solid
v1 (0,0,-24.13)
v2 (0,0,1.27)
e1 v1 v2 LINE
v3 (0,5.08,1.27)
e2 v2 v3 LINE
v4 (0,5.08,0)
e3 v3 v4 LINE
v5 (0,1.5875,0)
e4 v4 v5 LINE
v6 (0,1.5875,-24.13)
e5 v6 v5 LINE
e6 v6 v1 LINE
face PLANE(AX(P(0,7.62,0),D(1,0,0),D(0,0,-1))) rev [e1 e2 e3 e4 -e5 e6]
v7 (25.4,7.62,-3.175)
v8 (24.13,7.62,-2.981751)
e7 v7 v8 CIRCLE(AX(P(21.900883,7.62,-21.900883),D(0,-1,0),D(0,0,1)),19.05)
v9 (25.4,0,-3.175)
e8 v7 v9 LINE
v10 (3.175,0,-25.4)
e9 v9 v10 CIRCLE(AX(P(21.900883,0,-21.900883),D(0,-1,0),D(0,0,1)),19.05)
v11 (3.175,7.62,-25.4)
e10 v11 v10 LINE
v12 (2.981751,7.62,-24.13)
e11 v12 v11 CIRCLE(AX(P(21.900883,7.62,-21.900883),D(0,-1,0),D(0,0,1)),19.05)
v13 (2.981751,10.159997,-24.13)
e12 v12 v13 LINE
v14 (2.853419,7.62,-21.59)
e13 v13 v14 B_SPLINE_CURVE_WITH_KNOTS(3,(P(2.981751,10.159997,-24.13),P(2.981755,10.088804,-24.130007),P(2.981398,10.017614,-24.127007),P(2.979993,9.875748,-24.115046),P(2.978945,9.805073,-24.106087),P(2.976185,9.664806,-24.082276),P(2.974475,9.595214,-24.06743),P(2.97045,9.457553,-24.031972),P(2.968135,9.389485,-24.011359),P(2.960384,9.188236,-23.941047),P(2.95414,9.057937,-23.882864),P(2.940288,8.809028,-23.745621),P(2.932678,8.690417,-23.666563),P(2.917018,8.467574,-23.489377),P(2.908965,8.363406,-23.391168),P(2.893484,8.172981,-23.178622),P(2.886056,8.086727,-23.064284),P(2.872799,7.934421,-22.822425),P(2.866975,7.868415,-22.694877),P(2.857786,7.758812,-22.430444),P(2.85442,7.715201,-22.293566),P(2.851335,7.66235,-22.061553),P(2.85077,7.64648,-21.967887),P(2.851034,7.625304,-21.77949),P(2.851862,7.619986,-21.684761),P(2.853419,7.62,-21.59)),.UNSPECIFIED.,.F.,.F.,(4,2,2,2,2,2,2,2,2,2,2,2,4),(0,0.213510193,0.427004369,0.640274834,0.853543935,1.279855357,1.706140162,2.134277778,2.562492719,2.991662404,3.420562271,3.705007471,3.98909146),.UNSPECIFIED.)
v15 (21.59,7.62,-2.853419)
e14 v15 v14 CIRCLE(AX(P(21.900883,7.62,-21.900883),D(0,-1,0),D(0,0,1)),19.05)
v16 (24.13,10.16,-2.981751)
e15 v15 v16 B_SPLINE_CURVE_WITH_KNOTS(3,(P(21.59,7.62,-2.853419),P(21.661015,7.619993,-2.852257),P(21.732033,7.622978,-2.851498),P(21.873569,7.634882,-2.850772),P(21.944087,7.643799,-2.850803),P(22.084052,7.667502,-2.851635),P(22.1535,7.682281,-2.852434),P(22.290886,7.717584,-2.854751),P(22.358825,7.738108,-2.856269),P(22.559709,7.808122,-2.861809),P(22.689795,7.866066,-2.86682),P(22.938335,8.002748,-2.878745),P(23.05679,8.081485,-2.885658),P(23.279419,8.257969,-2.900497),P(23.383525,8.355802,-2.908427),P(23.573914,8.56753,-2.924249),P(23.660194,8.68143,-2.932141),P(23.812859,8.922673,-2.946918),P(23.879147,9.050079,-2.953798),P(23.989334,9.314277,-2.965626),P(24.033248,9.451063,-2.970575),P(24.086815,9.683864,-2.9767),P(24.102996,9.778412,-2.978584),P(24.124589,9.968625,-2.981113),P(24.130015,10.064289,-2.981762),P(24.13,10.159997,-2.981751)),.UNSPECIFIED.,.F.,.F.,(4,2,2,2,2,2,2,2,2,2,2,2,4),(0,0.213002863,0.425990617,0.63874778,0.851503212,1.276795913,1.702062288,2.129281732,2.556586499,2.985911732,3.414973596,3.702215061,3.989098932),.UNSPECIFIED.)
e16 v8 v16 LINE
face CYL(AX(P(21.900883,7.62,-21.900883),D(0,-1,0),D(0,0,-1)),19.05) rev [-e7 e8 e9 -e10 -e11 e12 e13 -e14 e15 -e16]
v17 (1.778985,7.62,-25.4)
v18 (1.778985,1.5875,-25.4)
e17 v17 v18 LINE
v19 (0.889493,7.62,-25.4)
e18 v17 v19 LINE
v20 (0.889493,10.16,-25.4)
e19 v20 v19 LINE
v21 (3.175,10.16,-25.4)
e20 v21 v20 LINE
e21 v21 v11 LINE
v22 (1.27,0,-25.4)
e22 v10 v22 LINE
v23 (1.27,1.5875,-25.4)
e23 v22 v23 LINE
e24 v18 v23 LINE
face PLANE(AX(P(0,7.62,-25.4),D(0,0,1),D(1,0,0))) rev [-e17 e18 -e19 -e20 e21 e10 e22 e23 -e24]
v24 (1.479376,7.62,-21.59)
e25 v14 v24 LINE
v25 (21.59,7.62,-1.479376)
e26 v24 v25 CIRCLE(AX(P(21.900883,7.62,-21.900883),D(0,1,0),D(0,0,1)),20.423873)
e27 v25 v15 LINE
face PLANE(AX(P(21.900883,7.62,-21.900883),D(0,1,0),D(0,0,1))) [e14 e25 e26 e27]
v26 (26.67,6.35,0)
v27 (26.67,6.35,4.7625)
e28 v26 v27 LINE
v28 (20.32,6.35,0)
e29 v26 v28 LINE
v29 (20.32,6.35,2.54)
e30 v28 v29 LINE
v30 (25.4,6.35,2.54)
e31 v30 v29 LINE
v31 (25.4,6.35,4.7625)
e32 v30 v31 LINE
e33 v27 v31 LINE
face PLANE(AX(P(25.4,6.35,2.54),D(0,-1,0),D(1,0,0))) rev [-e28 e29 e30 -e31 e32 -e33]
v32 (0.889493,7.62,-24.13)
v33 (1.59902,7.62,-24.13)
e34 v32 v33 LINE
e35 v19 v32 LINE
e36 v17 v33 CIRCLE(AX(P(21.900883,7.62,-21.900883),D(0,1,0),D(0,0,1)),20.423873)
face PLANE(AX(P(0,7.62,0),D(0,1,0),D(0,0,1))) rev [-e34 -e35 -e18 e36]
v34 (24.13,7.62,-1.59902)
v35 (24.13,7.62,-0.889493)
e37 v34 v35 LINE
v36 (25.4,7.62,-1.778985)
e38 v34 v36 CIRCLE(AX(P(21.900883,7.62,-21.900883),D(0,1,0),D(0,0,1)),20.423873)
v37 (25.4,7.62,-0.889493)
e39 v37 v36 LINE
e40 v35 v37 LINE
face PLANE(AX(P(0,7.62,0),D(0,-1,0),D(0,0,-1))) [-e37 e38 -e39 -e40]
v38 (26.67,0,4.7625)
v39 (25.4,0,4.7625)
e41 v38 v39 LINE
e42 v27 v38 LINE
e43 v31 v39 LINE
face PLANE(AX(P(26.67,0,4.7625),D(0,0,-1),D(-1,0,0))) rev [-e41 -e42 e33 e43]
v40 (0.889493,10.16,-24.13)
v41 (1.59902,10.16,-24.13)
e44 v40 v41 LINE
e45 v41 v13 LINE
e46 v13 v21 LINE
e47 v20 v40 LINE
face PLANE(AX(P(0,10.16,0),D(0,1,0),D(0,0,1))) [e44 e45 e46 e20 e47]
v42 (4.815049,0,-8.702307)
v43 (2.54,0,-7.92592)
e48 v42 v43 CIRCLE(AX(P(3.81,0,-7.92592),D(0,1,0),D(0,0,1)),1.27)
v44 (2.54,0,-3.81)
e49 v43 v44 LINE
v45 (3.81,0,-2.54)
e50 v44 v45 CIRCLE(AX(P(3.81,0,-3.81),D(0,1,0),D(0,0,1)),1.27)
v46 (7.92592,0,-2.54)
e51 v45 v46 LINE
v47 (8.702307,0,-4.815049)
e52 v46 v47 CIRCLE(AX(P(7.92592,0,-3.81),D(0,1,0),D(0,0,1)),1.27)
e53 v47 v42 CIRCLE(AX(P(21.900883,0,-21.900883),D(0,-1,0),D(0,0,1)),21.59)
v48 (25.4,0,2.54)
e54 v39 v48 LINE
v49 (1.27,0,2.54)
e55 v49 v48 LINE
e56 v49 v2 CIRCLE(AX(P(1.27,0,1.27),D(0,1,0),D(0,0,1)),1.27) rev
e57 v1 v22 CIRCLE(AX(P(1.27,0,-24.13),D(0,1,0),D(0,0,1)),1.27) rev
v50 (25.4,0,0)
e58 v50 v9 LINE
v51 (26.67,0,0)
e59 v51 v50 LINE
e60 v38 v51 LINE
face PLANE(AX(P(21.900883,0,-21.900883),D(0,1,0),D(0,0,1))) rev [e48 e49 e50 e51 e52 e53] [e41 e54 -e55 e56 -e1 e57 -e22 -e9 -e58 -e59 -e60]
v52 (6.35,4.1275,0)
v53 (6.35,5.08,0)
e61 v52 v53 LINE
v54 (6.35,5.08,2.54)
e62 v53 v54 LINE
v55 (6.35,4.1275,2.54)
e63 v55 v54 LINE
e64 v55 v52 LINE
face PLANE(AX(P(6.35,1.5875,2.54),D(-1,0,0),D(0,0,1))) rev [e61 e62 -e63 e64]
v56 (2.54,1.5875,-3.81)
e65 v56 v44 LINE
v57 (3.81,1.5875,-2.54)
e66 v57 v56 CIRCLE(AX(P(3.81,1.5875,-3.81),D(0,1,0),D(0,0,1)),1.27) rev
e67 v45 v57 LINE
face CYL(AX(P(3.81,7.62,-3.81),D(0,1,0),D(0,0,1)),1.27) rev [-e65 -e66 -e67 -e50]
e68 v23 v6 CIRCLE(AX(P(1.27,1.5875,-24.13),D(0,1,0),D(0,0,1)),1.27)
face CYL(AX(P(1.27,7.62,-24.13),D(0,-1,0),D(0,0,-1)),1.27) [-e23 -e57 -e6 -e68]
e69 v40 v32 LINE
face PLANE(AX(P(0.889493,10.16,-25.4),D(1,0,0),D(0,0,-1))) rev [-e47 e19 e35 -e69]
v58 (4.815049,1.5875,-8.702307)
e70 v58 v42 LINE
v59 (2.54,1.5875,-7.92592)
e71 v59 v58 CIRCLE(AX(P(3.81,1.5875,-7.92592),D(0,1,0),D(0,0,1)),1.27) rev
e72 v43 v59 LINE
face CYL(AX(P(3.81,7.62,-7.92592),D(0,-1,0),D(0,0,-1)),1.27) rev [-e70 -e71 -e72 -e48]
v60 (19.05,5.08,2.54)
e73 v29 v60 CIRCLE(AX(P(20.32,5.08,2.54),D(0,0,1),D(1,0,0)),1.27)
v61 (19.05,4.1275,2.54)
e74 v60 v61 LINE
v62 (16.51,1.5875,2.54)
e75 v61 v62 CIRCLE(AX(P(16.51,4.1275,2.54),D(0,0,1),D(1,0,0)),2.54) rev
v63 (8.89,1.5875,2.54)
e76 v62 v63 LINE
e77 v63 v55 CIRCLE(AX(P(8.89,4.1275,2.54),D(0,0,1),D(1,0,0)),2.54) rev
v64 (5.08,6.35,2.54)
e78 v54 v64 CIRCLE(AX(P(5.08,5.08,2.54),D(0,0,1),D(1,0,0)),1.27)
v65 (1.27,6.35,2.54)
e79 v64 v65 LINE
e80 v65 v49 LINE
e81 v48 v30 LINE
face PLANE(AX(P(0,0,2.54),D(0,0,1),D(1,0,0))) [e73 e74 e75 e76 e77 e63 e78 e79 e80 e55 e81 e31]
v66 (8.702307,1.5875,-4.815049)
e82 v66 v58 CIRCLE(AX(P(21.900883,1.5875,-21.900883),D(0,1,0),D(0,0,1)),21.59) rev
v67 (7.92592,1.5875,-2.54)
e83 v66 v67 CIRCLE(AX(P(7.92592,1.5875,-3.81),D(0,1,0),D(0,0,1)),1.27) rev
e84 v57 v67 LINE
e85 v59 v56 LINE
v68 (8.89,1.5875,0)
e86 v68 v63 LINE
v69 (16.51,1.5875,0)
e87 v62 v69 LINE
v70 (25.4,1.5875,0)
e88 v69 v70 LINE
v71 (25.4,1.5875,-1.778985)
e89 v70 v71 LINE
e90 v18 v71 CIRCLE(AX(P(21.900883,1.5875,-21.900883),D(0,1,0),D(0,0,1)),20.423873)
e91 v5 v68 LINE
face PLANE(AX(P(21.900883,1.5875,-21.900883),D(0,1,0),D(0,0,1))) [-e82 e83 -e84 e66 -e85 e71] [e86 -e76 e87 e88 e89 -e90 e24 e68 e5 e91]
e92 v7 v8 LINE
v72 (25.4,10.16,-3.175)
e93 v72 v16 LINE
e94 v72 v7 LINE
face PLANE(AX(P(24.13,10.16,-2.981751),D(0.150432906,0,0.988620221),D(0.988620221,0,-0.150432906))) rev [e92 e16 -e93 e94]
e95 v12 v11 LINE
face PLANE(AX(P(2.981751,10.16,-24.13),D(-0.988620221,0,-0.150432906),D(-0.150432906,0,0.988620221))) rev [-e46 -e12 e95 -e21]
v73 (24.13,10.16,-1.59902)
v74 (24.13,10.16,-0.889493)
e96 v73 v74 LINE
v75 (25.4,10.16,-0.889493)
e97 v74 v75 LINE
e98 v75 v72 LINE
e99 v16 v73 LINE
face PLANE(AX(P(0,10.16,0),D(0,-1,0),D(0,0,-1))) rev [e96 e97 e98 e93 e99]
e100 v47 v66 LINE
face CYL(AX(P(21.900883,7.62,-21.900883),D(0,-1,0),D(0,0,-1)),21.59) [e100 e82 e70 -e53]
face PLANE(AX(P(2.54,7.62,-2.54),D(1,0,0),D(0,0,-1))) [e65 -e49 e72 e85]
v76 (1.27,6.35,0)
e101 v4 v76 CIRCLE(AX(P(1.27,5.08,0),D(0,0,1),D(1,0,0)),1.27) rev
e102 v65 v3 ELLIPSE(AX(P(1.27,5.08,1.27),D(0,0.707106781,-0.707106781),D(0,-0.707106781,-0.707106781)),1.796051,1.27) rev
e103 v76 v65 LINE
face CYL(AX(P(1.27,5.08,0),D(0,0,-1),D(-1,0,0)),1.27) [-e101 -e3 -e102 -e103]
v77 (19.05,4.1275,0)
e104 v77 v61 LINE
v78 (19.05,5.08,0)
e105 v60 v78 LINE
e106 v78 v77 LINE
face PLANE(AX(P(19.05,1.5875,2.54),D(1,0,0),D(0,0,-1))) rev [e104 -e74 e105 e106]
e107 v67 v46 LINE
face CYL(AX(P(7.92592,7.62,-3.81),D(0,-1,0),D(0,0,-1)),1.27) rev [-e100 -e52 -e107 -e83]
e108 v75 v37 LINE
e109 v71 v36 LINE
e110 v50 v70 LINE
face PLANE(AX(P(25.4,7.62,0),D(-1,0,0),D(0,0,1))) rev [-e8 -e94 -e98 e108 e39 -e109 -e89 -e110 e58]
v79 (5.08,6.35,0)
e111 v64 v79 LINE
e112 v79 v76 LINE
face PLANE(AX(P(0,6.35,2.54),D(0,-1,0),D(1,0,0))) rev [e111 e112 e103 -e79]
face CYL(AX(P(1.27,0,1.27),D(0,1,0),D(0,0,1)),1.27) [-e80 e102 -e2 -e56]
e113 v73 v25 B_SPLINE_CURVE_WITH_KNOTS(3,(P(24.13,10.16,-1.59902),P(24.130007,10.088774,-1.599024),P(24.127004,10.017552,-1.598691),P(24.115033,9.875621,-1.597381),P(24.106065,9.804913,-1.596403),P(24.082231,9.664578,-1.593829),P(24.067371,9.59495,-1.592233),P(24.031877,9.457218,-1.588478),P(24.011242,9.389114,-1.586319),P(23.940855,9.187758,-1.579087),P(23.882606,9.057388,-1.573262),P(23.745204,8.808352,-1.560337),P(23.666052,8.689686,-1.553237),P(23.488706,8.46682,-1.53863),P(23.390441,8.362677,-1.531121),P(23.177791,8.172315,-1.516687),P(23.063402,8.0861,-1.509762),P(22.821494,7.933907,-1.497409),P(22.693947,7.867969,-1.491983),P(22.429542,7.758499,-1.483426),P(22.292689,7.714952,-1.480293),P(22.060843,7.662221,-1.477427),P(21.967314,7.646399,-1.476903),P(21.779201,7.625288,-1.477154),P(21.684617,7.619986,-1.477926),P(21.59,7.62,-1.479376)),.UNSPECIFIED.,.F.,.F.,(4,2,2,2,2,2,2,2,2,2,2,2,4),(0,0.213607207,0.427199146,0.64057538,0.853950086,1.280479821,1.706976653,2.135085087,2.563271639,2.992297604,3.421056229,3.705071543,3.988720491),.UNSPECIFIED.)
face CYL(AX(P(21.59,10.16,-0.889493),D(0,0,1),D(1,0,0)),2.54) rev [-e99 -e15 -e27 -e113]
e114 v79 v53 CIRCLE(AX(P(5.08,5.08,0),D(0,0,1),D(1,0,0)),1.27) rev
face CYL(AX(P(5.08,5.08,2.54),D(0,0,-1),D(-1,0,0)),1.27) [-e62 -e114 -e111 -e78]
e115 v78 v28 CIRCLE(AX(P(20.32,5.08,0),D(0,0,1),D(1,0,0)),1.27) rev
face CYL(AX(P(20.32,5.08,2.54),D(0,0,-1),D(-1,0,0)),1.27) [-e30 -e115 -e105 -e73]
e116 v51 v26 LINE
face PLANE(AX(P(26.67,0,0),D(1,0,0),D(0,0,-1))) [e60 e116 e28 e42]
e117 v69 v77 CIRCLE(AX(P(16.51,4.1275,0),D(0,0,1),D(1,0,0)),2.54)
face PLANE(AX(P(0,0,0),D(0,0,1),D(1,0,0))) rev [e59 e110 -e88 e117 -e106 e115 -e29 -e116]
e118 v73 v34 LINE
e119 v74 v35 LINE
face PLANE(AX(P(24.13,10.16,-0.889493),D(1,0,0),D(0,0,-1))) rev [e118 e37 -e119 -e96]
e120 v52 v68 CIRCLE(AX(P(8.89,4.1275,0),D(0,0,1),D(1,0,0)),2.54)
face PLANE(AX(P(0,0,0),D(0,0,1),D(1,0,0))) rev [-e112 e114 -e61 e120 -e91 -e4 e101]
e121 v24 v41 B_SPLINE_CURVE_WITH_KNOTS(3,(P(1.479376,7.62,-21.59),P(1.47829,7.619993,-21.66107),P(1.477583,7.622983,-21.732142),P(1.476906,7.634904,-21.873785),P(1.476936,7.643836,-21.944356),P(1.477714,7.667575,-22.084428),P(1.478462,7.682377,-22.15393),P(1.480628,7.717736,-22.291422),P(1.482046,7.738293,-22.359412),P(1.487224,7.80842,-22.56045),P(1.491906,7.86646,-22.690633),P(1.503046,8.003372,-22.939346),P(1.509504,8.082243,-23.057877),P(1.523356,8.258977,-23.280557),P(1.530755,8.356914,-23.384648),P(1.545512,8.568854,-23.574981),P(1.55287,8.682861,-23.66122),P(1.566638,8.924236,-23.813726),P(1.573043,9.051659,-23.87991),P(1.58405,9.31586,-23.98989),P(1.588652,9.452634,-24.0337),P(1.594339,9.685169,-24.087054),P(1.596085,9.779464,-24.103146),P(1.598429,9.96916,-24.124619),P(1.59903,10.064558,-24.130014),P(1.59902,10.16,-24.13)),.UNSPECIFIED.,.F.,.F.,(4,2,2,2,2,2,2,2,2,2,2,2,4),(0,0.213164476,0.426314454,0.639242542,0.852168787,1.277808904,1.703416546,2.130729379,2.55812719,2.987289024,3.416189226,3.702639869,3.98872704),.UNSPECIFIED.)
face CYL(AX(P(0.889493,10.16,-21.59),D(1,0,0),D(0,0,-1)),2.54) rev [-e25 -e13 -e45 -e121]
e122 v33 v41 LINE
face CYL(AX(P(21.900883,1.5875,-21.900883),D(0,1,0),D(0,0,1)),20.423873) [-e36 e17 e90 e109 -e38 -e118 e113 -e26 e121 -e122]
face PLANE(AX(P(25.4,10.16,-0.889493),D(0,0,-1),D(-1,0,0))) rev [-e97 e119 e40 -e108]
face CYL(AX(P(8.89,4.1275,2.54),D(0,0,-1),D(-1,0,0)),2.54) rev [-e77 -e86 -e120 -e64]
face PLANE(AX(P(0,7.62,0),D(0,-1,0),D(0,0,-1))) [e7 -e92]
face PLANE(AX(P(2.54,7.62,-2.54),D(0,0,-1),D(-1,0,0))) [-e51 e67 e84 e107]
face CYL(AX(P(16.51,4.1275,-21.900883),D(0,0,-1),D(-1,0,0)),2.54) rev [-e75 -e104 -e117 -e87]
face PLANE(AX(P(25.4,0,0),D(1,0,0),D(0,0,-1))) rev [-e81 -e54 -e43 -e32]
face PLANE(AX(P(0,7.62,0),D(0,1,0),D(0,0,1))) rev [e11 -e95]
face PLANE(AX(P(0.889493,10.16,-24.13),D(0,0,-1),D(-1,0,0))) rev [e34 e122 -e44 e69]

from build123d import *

# Parameters (mm, degrees)
BOSS_EXTRUDE1_DEPTH = 7.62
SKETCH2_R           = 33.285248113
SKETCH2_R_2         = 20.423872842
CUT_EXTRUDE1_DEPTH  = 6.0325
BOSS_EXTRUDE2_DEPTH = 2.54
BOSS_EXTRUDE3_DEPTH = 2.54
SKETCH5_W           = 4.7625
SKETCH5_H           = 6.35
BOSS_EXTRUDE4_DEPTH = 1.27
FILLET1_R           = 2.54
FILLET2_R           = 1.27


with BuildPart() as part:
    # Sketch1 → Boss-Extrude1 (new body)
    with BuildSketch(Plane(origin=(0, 0, 0), x_dir=(1, 0, 0), z_dir=(0, 1, 0))):
        with BuildLine():
            Line((0, 0), (25.4, 0))
            Line((25.4, 0), (25.4, 3.175))
            ThreePointArc((25.4, 3.175), (8.430498362, 8.430498362), (3.175, 25.4))
            Line((3.175, 25.4), (0, 25.4))
            Line((0, 25.4), (0, 0))
        make_face()
        with BuildLine():
            Line((2.54, 2.54), (2.54, 12.34659936))
            ThreePointArc((2.54, 12.34659936), (6.634447137, 6.634447137), (12.34659936, 2.54))
            Line((12.34659936, 2.54), (2.54, 2.54))
        make_face(mode=Mode.SUBTRACT)
    extrude(amount=BOSS_EXTRUDE1_DEPTH)

    # Sketch2 → Cut-Extrude1 (cut)
    with BuildSketch(Plane(origin=(0, 7.62, 0), x_dir=(1, 0, 0), z_dir=(0, 1, 0))):
        with Locations((21.900882543, 21.900882543)):
            Circle(SKETCH2_R)
        with Locations((21.900882543, 21.900882543)):
            Circle(SKETCH2_R_2, mode=Mode.SUBTRACT)
    extrude(amount=-CUT_EXTRUDE1_DEPTH, mode=Mode.SUBTRACT)

    # Sketch3 → Boss-Extrude2 (add)
    with BuildSketch(Plane.XY):
        Polygon((0, 0), (0, 6.35), (6.35, 6.35), (6.35, 1.5875), (19.05, 1.5875), (19.05, 6.35), (25.4, 6.35), (25.4, 0), align=None)
    extrude(amount=BOSS_EXTRUDE2_DEPTH)

    # Sketch4 → Boss-Extrude3 (add)
    with BuildSketch(Plane(origin=(0, 7.62, 0), x_dir=(1, 0, 0), z_dir=(0, 1, 0))):
        Polygon((3.175, 25.4), (0.889492523, 25.4), (0.889492523, 24.13), (2.981751079, 24.13), align=None)
        Polygon((25.4, 3.175), (25.4, 0.889492523), (24.13, 0.889492523), (24.13, 2.981751079), align=None)
    extrude(amount=BOSS_EXTRUDE3_DEPTH)

    # Sketch5 → Boss-Extrude4 (add)
    with BuildSketch(Plane(origin=(25.4, 0, 0), x_dir=(0, 0, -1), z_dir=(1, 0, 0))):
        with Locations((-2.38125, 3.175)):
            Rectangle(SKETCH5_W, SKETCH5_H)
    extrude(amount=BOSS_EXTRUDE4_DEPTH)

    # Fillet1
    # the kernel refuses this fillet: 2.54 mm, written as the material it adds along each edge
    with BuildSketch(Plane(origin=(19.05, 1.5875, 0), x_dir=(0, 1, 0), z_dir=(0, 0, 1))) as fillet1_piece_1:
        with BuildLine():
            CenterArc((FILLET1_R, FILLET1_R), FILLET1_R, 180, 90)
            Line((0, FILLET1_R), (0, 0))
            Line((0, 0), (FILLET1_R, 0))
        make_face()
    extrude(amount=2.54)
    with BuildSketch(Plane(origin=(6.35, 1.5875, 0), x_dir=(0, 1, 0), z_dir=(0, 0, 1))) as fillet1_piece_2:
        with BuildLine():
            CenterArc((FILLET1_R, -FILLET1_R), FILLET1_R, 90, 90)
            Line((0, -FILLET1_R), (0, 0))
            Line((0, 0), (FILLET1_R, 0))
        make_face()
    extrude(amount=2.54)
    with BuildSketch(Plane(origin=(-4.750979865, 7.62, -24.13), x_dir=(0, 0, 1), z_dir=(1, 0, 0))) as fillet1_piece_3_section:
        with BuildLine():
            CenterArc((FILLET1_R, -FILLET1_R), FILLET1_R, 90, 90)
            Line((0, -FILLET1_R), (0, 0))
            Line((0, 0), (FILLET1_R, 0))
        make_face()
    fillet1_piece_3 = extrude(amount=14.082730944, mode=Mode.PRIVATE)
    fillet1_piece_3 = fillet1_piece_3 & Plane(origin=(21.900882543, 8.195059905, -21.900882543), x_dir=(1, 0, 0), z_dir=(0, 1, 0)) * Cylinder(20.423872842, 39, mode=Mode.PRIVATE)
    fillet1_piece_3 = fillet1_piece_3 - Plane(origin=(21.900882543, 8.195059905, -21.900882543), x_dir=(0.18368070639060669, 0, 0.98298596027606), z_dir=(0, -1, 0)) * Cylinder(19.05, 39, mode=Mode.PRIVATE)
    add(fillet1_piece_3)
    with BuildSketch(Plane(origin=(24.13, 7.62, 4.750979865), x_dir=(0, 1, 0), z_dir=(0, 0, -1))) as fillet1_piece_4_section:
        with BuildLine():
            CenterArc((FILLET1_R, -FILLET1_R), FILLET1_R, 90, 90)
            Line((0, -FILLET1_R), (0, 0))
            Line((0, 0), (FILLET1_R, 0))
        make_face()
    fillet1_piece_4 = extrude(amount=14.082730944, mode=Mode.PRIVATE)
    fillet1_piece_4 = fillet1_piece_4 & Plane(origin=(21.900882543, 8.195056038, -21.900882543), x_dir=(1, 0, 0), z_dir=(0, 1, 0)) * Cylinder(20.423872842, 39, mode=Mode.PRIVATE)
    fillet1_piece_4 = fillet1_piece_4 - Plane(origin=(21.900882543, 8.195056038, -21.900882543), x_dir=(0.18368070639060669, 0, 0.98298596027606), z_dir=(0, -1, 0)) * Cylinder(19.05, 39, mode=Mode.PRIVATE)
    add(fillet1_piece_4)

    # Fillet2
    fillet2_edges = [part.edges().sort_by_distance(p)[0] for p in [
        (2.54, 0.79375, -12.34659936),
        (2.54, 0.79375, -2.54),
        (12.34659936, 0.79375, -2.54),
        (0, 0.79375, -25.4),
        (19.05, 6.35, 1.27),
        (6.35, 6.35, 1.27),
        (0, 6.35, 1.27),
        (0, 3.175, 2.54),
    ]]
    fillet(fillet2_edges, radius=FILLET2_R)


solid = part.part
